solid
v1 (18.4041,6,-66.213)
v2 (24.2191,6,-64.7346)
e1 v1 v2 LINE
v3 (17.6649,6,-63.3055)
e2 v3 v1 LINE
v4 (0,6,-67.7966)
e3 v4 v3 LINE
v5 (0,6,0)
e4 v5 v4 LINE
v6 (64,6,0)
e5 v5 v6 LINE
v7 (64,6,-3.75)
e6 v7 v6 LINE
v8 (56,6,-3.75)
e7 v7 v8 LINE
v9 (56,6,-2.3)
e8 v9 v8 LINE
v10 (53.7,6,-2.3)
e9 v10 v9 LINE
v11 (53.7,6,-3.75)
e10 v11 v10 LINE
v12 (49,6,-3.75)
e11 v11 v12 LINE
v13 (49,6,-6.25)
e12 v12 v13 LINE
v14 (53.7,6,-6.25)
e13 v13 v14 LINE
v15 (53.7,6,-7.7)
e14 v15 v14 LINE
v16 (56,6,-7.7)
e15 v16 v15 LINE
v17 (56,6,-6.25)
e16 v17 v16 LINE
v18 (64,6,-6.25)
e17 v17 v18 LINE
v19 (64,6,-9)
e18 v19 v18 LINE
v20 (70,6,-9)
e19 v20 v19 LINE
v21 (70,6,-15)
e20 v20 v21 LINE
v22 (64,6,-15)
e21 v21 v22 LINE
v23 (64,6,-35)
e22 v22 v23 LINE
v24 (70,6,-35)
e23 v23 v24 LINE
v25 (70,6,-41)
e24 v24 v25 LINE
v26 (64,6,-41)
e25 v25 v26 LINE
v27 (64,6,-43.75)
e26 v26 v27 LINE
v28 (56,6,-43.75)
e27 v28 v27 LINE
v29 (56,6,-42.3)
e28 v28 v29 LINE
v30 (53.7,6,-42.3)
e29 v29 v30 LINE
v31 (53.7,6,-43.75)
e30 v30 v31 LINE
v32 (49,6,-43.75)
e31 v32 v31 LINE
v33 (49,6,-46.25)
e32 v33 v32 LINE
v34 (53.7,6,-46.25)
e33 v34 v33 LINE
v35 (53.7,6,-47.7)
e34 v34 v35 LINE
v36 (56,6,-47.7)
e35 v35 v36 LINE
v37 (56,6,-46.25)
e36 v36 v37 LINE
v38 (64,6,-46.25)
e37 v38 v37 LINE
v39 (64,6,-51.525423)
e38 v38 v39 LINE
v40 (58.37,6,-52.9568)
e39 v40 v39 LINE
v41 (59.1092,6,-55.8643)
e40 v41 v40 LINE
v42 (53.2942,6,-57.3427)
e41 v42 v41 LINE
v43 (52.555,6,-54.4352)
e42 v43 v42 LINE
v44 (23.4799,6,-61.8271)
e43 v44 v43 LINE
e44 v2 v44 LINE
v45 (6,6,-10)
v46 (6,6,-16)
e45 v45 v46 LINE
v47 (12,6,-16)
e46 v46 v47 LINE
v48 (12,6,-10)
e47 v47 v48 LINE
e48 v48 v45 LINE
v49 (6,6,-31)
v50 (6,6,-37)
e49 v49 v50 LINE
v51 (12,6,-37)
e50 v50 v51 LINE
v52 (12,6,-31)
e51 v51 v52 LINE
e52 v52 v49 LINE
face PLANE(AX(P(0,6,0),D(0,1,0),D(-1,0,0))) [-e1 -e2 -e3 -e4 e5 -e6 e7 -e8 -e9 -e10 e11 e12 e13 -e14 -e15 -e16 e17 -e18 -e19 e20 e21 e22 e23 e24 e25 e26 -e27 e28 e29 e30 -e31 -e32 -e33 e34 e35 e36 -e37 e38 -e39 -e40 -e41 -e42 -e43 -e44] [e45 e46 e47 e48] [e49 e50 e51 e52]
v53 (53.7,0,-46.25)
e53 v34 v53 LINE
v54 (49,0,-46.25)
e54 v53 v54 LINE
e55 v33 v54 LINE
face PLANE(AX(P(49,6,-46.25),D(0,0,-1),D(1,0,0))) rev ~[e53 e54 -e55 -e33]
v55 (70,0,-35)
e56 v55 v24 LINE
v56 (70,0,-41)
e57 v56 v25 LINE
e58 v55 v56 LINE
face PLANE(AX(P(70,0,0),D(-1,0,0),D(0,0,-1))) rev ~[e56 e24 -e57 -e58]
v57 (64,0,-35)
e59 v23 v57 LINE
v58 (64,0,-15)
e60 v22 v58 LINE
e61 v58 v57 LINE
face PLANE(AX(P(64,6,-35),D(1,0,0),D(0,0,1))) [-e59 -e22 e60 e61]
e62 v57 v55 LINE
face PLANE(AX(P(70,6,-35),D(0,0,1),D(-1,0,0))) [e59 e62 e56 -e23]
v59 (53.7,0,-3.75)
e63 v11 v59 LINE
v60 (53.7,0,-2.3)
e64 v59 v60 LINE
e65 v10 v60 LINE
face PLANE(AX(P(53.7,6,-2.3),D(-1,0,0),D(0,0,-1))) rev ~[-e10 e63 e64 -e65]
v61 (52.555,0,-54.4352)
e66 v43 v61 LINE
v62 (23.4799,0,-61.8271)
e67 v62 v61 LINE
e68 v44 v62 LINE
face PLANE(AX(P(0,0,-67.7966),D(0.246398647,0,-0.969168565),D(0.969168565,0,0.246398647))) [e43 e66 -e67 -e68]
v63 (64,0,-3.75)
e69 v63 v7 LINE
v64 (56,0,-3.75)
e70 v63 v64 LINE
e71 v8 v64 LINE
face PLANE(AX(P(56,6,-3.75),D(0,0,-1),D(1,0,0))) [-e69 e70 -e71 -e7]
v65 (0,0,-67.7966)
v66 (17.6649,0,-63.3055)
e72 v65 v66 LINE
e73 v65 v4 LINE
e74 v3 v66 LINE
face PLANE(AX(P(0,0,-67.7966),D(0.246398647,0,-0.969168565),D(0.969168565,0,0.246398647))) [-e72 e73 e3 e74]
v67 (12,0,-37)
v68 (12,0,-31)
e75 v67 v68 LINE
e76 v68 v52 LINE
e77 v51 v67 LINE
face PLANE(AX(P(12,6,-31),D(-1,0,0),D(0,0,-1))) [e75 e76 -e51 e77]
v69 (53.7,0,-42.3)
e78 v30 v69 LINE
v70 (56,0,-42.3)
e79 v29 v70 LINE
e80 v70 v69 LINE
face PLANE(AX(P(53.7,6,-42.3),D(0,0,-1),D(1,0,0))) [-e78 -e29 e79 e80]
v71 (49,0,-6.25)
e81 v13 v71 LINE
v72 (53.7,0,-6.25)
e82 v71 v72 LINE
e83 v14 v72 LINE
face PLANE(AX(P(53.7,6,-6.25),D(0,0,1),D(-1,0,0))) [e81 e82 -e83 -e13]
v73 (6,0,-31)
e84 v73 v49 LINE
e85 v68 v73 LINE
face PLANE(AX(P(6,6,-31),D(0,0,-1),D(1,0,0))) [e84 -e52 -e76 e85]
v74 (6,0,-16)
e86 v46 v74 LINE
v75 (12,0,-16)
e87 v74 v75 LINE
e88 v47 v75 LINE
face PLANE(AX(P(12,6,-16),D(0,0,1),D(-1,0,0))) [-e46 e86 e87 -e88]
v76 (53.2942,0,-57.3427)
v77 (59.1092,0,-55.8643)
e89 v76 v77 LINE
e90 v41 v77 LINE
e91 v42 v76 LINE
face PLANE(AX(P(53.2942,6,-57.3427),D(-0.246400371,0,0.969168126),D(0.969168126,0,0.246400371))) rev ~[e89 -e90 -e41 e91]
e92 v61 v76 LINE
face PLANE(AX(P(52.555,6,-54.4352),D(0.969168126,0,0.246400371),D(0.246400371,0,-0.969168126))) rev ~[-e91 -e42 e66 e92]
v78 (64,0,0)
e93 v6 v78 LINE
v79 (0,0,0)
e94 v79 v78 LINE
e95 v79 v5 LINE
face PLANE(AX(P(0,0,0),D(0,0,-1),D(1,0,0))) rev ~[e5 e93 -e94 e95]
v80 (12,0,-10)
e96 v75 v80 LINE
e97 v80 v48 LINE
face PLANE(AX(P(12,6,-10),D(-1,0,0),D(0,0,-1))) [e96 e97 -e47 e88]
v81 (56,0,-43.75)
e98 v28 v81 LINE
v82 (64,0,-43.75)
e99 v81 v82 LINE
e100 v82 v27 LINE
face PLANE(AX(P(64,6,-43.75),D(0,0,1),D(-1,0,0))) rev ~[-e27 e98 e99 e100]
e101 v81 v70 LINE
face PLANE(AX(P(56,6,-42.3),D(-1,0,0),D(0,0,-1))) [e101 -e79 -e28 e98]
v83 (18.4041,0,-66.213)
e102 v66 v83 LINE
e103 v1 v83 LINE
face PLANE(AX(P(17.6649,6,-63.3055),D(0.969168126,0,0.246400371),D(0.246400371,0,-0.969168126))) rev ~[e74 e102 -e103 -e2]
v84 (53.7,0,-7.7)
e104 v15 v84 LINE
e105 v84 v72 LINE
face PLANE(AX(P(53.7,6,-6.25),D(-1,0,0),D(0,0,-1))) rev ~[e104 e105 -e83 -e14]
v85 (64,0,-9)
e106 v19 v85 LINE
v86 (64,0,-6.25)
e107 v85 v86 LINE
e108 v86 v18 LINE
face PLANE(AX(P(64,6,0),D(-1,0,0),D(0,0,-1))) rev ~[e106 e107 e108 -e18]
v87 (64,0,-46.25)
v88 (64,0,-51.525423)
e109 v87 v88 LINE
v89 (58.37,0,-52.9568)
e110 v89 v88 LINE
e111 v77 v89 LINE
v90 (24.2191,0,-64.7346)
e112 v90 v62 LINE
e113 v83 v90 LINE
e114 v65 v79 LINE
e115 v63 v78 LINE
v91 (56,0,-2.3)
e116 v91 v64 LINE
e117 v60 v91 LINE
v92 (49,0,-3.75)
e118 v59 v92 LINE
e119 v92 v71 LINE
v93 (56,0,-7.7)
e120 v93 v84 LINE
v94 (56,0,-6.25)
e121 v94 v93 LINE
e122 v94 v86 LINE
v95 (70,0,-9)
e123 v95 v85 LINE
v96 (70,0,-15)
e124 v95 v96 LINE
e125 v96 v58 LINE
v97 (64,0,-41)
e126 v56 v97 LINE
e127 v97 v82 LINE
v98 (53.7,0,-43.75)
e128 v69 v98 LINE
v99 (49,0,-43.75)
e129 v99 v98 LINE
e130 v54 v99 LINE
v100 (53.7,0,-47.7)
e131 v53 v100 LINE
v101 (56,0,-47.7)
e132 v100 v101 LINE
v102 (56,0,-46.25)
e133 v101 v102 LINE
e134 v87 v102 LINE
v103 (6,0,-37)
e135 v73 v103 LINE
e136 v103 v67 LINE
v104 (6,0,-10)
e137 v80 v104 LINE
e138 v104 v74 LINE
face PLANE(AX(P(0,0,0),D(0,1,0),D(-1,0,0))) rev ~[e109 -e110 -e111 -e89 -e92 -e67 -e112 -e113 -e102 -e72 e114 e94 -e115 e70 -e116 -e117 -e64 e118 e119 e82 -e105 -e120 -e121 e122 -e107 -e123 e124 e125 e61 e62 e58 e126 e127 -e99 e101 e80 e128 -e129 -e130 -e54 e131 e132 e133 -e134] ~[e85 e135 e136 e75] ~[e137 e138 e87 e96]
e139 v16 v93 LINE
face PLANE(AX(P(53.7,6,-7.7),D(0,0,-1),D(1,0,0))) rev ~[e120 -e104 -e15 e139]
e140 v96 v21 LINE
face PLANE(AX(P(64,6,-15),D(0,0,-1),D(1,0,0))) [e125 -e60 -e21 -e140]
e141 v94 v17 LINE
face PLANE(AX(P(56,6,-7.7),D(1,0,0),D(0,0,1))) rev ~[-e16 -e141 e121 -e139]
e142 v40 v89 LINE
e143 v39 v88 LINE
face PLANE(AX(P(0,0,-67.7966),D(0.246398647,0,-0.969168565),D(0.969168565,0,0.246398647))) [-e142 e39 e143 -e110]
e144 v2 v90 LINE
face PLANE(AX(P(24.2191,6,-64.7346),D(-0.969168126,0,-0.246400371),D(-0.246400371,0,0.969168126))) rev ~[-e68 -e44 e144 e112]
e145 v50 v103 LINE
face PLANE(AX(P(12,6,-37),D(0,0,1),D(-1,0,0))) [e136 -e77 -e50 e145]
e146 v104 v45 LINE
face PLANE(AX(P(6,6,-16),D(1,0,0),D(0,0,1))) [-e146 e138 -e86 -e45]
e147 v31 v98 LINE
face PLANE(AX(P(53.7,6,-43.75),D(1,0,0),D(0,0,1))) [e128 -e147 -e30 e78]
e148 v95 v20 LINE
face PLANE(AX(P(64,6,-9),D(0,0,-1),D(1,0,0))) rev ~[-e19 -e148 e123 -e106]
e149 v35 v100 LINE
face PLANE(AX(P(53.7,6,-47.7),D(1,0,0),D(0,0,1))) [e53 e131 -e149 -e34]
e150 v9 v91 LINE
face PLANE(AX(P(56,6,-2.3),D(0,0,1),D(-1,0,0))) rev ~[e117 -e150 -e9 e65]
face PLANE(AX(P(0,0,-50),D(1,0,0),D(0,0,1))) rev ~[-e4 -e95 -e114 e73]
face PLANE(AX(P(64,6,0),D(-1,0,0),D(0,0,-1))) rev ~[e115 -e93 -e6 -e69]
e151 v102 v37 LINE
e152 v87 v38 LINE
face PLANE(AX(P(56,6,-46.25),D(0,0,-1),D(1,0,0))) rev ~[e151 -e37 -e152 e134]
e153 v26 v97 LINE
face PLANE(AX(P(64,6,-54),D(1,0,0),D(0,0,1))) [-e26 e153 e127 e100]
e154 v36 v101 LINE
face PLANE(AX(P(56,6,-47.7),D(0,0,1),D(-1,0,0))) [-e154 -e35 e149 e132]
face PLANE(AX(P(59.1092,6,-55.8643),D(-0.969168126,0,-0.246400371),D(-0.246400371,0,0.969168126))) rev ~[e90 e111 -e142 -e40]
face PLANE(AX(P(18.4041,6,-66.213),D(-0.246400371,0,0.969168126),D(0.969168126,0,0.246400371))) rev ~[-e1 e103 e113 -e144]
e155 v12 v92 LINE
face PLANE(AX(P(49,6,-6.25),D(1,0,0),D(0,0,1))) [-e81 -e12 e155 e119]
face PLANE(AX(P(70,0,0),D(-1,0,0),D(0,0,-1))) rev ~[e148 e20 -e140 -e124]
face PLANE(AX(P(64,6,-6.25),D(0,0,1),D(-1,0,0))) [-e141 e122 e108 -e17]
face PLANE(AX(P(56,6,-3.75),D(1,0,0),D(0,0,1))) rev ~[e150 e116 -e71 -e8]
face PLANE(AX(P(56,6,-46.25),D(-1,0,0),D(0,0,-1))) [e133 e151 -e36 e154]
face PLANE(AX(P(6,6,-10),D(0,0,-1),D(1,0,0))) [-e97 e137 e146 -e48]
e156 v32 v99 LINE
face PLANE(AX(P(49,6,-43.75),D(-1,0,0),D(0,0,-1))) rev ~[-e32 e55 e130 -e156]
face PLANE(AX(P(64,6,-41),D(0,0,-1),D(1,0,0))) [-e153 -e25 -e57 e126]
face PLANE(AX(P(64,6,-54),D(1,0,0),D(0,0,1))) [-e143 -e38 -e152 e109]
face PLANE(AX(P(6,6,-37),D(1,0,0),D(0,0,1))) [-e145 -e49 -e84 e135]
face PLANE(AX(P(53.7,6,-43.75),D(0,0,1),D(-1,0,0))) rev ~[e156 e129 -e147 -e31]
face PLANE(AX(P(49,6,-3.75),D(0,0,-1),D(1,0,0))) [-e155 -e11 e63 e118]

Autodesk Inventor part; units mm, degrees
ref_plane "YZ Plane" through (0, 0, 0) normal (1, 0, 0) x (0, 1, 0)
ref_plane "XZ Plane" through (0, 0, 0) normal (0, 1, 0) x (-1, 0, 0)
ref_plane "XY Plane" through (0, 0, 0) normal (0, 0, 1) x (1, 0, 0)
sketch "Sketch1" plane through (0, 0, 0) normal (0, 1, 0) x (-1, 0, 0)
  line L0 (0, 0) -> (-70, 0)
  line L1 (-70, 0) -> (-70, -50)
  line L2 (-70, -50) -> (0, -50)
  line L3 (0, -50) -> (0, 0)
  line L4 (0, -50) -> (0, -67.7966)
  line L5 (0, -67.7966) -> (-70, -50)
  dimension "d0" = 70
  dimension "d1" = 50
  dimension "d45" = 14.264
extrude "Extrusion1" add sketch "Sketch1" along normal blind 6
sketch "Sketch2" plane through (0, 6, 0) normal (0, 1, 0) x (1, 0, 0)
  line L0 (70, 50) -> (58.37, 52.9568) construction
  line L1 (70, 50) -> (0, 67.7966) construction
  line L2 (58.37, 52.9568) -> (52.555, 54.4352)
  line L3 (52.555, 54.4352) -> (53.2942, 57.3427)
  line L4 (53.2942, 57.3427) -> (59.1092, 55.8643)
  line L5 (59.1092, 55.8643) -> (58.37, 52.9568)
  line L6 (23.4799, 61.8271) -> (17.6649, 63.3055)
  line L7 (17.6649, 63.3055) -> (18.4041, 66.213)
  line L8 (18.4041, 66.213) -> (24.2191, 64.7346)
  line L9 (24.2191, 64.7346) -> (23.4799, 61.8271)
  point P0 (0, 0)
  dimension "d9" = 12
  dimension "d10" = 6
  dimension "d11" = 3
  dimension "d15" = 6
  dimension "d16" = 3
  dimension "d17" = 30
extrude "Extrusion2" add sketch "Sketch2" against normal blind 6
sketch "Sketch3" plane through (0, 6, 0) normal (0, 1, 0) x (1, 0, 0)
  line L0 (70, 0) -> (70, 50) projected
  line L1 (70, 54) -> (64, 54)
  line L2 (64, 54) -> (64, 41)
  line L3 (64, 41) -> (70, 41)
  line L4 (70, 41) -> (70, 54)
  line L5 (70, 0) -> (64, 0)
  line L6 (64, 0) -> (64, 9)
  line L7 (64, 9) -> (70, 9)
  line L8 (70, 9) -> (70, 0)
  line L9 (70, 35) -> (64, 35)
  line L10 (64, 35) -> (64, 15)
  line L11 (64, 15) -> (70, 15)
  line L12 (70, 15) -> (70, 35)
  point P0 (0, 0)
  dimension "d18" = 6
  dimension "d20" = 6
  dimension "d21" = 9
  dimension "d22" = 6
  dimension "d23" = 6
  dimension "d27" = 20
  dimension "d36" = 13
extrude "Extrusion3" cut sketch "Sketch3" along normal through all both and the other way through all
sketch "Sketch4" plane through (0, 6, 0) normal (0, 1, 0) x (1, 0, 0)
  line L0 (64, 0) -> (64, 9) projected
  line L1 (64, 6.25) -> (56, 6.25)
  line L2 (49, 6.25) -> (49, 3.75)
  line L3 (49, 3.75) -> (53.7, 3.75)
  line L4 (64, 3.75) -> (64, 6.25)
  line L5 (64, 9) -> (70, 9) projected
  line L6 (64, 43.75) -> (56, 43.75)
  line L7 (49, 43.75) -> (49, 46.25)
  line L8 (49, 46.25) -> (53.7, 46.25)
  line L9 (64, 46.25) -> (64, 43.75)
  line L10 (70, 41) -> (64, 41) projected
  line L11 (64, 41) -> (64, 51.5254) projected
  line L12 (56, 47.7) -> (53.7, 47.7)
  line L13 (53.7, 47.7) -> (53.7, 46.25)
  line L14 (53.7, 42.3) -> (56, 42.3)
  line L15 (56, 42.3) -> (56, 43.75)
  line L16 (53.7, 7.7) -> (56, 7.7)
  line L17 (56, 7.7) -> (56, 6.25)
  line L18 (56, 2.3) -> (53.7, 2.3)
  line L19 (53.7, 2.3) -> (53.7, 3.75)
  line L20 (53.7, 6.25) -> (53.7, 7.7)
  line L21 (53.7, 3.75) -> (53.7, 6.25) construction
  line L22 (56, 6.25) -> (56, 3.75) construction
  line L23 (56, 3.75) -> (56, 2.3)
  line L24 (56, 3.75) -> (64, 3.75)
  line L25 (53.7, 3.75) -> (56, 3.75) construction
  line L26 (56, 6.25) -> (53.7, 6.25) construction
  line L27 (53.7, 6.25) -> (49, 6.25)
  line L28 (53.7, 43.75) -> (53.7, 42.3)
  line L29 (53.7, 46.25) -> (53.7, 43.75) construction
  line L30 (53.7, 43.75) -> (49, 43.75)
  line L31 (56, 43.75) -> (53.7, 43.75) construction
  line L32 (56, 46.25) -> (56, 47.7)
  line L33 (56, 43.75) -> (56, 46.25) construction
  line L34 (53.7, 46.25) -> (56, 46.25) construction
  line L35 (56, 46.25) -> (64, 46.25)
  line L36 (6, 10) -> (12, 10)
  line L37 (12, 10) -> (12, 16)
  line L38 (12, 16) -> (6, 16)
  line L39 (6, 16) -> (6, 10)
  line L40 (6, 31) -> (12, 31)
  line L41 (12, 31) -> (12, 37)
  line L42 (12, 37) -> (6, 37)
  line L43 (6, 37) -> (6, 31)
  line L44 (0, 0) -> (64, 0) projected
  line L45 (0, 67.7966) -> (0, 0) projected
  point P0 (64, 45)
  dimension "d37" = 15
  dimension "d38" = 2.5
  dimension "d42" = 15
  dimension "d43" = 2.5
  dimension "d44" = 2.75
  dimension "d46" = 2.75
  dimension "d47" = 5.4
  dimension "d48" = 2.3
  dimension "d49" = 5.4
  dimension "d50" = 8
  dimension "d51" = 8
  dimension "d52" = 6
  dimension "d53" = 6
  dimension "d54" = 6
  dimension "d55" = 6
  dimension "d56" = 10
  dimension "d57" = 6
  dimension "d58" = 15
extrude "Extrusion4" cut sketch "Sketch4" along normal through all both and the other way through all
equation "\"d15\" = d10"
equation "\"d16\" = d11"
equation "\"d18\" = d20"
equation "\"d42\" = d37"
equation "\"d43\" = d38"
equation "\"d44\" = d46"
equation "\"d50\" = d51"
equation "\"d54\" = d52"
properties part number "pinball-case-left-wal-scaledl"
